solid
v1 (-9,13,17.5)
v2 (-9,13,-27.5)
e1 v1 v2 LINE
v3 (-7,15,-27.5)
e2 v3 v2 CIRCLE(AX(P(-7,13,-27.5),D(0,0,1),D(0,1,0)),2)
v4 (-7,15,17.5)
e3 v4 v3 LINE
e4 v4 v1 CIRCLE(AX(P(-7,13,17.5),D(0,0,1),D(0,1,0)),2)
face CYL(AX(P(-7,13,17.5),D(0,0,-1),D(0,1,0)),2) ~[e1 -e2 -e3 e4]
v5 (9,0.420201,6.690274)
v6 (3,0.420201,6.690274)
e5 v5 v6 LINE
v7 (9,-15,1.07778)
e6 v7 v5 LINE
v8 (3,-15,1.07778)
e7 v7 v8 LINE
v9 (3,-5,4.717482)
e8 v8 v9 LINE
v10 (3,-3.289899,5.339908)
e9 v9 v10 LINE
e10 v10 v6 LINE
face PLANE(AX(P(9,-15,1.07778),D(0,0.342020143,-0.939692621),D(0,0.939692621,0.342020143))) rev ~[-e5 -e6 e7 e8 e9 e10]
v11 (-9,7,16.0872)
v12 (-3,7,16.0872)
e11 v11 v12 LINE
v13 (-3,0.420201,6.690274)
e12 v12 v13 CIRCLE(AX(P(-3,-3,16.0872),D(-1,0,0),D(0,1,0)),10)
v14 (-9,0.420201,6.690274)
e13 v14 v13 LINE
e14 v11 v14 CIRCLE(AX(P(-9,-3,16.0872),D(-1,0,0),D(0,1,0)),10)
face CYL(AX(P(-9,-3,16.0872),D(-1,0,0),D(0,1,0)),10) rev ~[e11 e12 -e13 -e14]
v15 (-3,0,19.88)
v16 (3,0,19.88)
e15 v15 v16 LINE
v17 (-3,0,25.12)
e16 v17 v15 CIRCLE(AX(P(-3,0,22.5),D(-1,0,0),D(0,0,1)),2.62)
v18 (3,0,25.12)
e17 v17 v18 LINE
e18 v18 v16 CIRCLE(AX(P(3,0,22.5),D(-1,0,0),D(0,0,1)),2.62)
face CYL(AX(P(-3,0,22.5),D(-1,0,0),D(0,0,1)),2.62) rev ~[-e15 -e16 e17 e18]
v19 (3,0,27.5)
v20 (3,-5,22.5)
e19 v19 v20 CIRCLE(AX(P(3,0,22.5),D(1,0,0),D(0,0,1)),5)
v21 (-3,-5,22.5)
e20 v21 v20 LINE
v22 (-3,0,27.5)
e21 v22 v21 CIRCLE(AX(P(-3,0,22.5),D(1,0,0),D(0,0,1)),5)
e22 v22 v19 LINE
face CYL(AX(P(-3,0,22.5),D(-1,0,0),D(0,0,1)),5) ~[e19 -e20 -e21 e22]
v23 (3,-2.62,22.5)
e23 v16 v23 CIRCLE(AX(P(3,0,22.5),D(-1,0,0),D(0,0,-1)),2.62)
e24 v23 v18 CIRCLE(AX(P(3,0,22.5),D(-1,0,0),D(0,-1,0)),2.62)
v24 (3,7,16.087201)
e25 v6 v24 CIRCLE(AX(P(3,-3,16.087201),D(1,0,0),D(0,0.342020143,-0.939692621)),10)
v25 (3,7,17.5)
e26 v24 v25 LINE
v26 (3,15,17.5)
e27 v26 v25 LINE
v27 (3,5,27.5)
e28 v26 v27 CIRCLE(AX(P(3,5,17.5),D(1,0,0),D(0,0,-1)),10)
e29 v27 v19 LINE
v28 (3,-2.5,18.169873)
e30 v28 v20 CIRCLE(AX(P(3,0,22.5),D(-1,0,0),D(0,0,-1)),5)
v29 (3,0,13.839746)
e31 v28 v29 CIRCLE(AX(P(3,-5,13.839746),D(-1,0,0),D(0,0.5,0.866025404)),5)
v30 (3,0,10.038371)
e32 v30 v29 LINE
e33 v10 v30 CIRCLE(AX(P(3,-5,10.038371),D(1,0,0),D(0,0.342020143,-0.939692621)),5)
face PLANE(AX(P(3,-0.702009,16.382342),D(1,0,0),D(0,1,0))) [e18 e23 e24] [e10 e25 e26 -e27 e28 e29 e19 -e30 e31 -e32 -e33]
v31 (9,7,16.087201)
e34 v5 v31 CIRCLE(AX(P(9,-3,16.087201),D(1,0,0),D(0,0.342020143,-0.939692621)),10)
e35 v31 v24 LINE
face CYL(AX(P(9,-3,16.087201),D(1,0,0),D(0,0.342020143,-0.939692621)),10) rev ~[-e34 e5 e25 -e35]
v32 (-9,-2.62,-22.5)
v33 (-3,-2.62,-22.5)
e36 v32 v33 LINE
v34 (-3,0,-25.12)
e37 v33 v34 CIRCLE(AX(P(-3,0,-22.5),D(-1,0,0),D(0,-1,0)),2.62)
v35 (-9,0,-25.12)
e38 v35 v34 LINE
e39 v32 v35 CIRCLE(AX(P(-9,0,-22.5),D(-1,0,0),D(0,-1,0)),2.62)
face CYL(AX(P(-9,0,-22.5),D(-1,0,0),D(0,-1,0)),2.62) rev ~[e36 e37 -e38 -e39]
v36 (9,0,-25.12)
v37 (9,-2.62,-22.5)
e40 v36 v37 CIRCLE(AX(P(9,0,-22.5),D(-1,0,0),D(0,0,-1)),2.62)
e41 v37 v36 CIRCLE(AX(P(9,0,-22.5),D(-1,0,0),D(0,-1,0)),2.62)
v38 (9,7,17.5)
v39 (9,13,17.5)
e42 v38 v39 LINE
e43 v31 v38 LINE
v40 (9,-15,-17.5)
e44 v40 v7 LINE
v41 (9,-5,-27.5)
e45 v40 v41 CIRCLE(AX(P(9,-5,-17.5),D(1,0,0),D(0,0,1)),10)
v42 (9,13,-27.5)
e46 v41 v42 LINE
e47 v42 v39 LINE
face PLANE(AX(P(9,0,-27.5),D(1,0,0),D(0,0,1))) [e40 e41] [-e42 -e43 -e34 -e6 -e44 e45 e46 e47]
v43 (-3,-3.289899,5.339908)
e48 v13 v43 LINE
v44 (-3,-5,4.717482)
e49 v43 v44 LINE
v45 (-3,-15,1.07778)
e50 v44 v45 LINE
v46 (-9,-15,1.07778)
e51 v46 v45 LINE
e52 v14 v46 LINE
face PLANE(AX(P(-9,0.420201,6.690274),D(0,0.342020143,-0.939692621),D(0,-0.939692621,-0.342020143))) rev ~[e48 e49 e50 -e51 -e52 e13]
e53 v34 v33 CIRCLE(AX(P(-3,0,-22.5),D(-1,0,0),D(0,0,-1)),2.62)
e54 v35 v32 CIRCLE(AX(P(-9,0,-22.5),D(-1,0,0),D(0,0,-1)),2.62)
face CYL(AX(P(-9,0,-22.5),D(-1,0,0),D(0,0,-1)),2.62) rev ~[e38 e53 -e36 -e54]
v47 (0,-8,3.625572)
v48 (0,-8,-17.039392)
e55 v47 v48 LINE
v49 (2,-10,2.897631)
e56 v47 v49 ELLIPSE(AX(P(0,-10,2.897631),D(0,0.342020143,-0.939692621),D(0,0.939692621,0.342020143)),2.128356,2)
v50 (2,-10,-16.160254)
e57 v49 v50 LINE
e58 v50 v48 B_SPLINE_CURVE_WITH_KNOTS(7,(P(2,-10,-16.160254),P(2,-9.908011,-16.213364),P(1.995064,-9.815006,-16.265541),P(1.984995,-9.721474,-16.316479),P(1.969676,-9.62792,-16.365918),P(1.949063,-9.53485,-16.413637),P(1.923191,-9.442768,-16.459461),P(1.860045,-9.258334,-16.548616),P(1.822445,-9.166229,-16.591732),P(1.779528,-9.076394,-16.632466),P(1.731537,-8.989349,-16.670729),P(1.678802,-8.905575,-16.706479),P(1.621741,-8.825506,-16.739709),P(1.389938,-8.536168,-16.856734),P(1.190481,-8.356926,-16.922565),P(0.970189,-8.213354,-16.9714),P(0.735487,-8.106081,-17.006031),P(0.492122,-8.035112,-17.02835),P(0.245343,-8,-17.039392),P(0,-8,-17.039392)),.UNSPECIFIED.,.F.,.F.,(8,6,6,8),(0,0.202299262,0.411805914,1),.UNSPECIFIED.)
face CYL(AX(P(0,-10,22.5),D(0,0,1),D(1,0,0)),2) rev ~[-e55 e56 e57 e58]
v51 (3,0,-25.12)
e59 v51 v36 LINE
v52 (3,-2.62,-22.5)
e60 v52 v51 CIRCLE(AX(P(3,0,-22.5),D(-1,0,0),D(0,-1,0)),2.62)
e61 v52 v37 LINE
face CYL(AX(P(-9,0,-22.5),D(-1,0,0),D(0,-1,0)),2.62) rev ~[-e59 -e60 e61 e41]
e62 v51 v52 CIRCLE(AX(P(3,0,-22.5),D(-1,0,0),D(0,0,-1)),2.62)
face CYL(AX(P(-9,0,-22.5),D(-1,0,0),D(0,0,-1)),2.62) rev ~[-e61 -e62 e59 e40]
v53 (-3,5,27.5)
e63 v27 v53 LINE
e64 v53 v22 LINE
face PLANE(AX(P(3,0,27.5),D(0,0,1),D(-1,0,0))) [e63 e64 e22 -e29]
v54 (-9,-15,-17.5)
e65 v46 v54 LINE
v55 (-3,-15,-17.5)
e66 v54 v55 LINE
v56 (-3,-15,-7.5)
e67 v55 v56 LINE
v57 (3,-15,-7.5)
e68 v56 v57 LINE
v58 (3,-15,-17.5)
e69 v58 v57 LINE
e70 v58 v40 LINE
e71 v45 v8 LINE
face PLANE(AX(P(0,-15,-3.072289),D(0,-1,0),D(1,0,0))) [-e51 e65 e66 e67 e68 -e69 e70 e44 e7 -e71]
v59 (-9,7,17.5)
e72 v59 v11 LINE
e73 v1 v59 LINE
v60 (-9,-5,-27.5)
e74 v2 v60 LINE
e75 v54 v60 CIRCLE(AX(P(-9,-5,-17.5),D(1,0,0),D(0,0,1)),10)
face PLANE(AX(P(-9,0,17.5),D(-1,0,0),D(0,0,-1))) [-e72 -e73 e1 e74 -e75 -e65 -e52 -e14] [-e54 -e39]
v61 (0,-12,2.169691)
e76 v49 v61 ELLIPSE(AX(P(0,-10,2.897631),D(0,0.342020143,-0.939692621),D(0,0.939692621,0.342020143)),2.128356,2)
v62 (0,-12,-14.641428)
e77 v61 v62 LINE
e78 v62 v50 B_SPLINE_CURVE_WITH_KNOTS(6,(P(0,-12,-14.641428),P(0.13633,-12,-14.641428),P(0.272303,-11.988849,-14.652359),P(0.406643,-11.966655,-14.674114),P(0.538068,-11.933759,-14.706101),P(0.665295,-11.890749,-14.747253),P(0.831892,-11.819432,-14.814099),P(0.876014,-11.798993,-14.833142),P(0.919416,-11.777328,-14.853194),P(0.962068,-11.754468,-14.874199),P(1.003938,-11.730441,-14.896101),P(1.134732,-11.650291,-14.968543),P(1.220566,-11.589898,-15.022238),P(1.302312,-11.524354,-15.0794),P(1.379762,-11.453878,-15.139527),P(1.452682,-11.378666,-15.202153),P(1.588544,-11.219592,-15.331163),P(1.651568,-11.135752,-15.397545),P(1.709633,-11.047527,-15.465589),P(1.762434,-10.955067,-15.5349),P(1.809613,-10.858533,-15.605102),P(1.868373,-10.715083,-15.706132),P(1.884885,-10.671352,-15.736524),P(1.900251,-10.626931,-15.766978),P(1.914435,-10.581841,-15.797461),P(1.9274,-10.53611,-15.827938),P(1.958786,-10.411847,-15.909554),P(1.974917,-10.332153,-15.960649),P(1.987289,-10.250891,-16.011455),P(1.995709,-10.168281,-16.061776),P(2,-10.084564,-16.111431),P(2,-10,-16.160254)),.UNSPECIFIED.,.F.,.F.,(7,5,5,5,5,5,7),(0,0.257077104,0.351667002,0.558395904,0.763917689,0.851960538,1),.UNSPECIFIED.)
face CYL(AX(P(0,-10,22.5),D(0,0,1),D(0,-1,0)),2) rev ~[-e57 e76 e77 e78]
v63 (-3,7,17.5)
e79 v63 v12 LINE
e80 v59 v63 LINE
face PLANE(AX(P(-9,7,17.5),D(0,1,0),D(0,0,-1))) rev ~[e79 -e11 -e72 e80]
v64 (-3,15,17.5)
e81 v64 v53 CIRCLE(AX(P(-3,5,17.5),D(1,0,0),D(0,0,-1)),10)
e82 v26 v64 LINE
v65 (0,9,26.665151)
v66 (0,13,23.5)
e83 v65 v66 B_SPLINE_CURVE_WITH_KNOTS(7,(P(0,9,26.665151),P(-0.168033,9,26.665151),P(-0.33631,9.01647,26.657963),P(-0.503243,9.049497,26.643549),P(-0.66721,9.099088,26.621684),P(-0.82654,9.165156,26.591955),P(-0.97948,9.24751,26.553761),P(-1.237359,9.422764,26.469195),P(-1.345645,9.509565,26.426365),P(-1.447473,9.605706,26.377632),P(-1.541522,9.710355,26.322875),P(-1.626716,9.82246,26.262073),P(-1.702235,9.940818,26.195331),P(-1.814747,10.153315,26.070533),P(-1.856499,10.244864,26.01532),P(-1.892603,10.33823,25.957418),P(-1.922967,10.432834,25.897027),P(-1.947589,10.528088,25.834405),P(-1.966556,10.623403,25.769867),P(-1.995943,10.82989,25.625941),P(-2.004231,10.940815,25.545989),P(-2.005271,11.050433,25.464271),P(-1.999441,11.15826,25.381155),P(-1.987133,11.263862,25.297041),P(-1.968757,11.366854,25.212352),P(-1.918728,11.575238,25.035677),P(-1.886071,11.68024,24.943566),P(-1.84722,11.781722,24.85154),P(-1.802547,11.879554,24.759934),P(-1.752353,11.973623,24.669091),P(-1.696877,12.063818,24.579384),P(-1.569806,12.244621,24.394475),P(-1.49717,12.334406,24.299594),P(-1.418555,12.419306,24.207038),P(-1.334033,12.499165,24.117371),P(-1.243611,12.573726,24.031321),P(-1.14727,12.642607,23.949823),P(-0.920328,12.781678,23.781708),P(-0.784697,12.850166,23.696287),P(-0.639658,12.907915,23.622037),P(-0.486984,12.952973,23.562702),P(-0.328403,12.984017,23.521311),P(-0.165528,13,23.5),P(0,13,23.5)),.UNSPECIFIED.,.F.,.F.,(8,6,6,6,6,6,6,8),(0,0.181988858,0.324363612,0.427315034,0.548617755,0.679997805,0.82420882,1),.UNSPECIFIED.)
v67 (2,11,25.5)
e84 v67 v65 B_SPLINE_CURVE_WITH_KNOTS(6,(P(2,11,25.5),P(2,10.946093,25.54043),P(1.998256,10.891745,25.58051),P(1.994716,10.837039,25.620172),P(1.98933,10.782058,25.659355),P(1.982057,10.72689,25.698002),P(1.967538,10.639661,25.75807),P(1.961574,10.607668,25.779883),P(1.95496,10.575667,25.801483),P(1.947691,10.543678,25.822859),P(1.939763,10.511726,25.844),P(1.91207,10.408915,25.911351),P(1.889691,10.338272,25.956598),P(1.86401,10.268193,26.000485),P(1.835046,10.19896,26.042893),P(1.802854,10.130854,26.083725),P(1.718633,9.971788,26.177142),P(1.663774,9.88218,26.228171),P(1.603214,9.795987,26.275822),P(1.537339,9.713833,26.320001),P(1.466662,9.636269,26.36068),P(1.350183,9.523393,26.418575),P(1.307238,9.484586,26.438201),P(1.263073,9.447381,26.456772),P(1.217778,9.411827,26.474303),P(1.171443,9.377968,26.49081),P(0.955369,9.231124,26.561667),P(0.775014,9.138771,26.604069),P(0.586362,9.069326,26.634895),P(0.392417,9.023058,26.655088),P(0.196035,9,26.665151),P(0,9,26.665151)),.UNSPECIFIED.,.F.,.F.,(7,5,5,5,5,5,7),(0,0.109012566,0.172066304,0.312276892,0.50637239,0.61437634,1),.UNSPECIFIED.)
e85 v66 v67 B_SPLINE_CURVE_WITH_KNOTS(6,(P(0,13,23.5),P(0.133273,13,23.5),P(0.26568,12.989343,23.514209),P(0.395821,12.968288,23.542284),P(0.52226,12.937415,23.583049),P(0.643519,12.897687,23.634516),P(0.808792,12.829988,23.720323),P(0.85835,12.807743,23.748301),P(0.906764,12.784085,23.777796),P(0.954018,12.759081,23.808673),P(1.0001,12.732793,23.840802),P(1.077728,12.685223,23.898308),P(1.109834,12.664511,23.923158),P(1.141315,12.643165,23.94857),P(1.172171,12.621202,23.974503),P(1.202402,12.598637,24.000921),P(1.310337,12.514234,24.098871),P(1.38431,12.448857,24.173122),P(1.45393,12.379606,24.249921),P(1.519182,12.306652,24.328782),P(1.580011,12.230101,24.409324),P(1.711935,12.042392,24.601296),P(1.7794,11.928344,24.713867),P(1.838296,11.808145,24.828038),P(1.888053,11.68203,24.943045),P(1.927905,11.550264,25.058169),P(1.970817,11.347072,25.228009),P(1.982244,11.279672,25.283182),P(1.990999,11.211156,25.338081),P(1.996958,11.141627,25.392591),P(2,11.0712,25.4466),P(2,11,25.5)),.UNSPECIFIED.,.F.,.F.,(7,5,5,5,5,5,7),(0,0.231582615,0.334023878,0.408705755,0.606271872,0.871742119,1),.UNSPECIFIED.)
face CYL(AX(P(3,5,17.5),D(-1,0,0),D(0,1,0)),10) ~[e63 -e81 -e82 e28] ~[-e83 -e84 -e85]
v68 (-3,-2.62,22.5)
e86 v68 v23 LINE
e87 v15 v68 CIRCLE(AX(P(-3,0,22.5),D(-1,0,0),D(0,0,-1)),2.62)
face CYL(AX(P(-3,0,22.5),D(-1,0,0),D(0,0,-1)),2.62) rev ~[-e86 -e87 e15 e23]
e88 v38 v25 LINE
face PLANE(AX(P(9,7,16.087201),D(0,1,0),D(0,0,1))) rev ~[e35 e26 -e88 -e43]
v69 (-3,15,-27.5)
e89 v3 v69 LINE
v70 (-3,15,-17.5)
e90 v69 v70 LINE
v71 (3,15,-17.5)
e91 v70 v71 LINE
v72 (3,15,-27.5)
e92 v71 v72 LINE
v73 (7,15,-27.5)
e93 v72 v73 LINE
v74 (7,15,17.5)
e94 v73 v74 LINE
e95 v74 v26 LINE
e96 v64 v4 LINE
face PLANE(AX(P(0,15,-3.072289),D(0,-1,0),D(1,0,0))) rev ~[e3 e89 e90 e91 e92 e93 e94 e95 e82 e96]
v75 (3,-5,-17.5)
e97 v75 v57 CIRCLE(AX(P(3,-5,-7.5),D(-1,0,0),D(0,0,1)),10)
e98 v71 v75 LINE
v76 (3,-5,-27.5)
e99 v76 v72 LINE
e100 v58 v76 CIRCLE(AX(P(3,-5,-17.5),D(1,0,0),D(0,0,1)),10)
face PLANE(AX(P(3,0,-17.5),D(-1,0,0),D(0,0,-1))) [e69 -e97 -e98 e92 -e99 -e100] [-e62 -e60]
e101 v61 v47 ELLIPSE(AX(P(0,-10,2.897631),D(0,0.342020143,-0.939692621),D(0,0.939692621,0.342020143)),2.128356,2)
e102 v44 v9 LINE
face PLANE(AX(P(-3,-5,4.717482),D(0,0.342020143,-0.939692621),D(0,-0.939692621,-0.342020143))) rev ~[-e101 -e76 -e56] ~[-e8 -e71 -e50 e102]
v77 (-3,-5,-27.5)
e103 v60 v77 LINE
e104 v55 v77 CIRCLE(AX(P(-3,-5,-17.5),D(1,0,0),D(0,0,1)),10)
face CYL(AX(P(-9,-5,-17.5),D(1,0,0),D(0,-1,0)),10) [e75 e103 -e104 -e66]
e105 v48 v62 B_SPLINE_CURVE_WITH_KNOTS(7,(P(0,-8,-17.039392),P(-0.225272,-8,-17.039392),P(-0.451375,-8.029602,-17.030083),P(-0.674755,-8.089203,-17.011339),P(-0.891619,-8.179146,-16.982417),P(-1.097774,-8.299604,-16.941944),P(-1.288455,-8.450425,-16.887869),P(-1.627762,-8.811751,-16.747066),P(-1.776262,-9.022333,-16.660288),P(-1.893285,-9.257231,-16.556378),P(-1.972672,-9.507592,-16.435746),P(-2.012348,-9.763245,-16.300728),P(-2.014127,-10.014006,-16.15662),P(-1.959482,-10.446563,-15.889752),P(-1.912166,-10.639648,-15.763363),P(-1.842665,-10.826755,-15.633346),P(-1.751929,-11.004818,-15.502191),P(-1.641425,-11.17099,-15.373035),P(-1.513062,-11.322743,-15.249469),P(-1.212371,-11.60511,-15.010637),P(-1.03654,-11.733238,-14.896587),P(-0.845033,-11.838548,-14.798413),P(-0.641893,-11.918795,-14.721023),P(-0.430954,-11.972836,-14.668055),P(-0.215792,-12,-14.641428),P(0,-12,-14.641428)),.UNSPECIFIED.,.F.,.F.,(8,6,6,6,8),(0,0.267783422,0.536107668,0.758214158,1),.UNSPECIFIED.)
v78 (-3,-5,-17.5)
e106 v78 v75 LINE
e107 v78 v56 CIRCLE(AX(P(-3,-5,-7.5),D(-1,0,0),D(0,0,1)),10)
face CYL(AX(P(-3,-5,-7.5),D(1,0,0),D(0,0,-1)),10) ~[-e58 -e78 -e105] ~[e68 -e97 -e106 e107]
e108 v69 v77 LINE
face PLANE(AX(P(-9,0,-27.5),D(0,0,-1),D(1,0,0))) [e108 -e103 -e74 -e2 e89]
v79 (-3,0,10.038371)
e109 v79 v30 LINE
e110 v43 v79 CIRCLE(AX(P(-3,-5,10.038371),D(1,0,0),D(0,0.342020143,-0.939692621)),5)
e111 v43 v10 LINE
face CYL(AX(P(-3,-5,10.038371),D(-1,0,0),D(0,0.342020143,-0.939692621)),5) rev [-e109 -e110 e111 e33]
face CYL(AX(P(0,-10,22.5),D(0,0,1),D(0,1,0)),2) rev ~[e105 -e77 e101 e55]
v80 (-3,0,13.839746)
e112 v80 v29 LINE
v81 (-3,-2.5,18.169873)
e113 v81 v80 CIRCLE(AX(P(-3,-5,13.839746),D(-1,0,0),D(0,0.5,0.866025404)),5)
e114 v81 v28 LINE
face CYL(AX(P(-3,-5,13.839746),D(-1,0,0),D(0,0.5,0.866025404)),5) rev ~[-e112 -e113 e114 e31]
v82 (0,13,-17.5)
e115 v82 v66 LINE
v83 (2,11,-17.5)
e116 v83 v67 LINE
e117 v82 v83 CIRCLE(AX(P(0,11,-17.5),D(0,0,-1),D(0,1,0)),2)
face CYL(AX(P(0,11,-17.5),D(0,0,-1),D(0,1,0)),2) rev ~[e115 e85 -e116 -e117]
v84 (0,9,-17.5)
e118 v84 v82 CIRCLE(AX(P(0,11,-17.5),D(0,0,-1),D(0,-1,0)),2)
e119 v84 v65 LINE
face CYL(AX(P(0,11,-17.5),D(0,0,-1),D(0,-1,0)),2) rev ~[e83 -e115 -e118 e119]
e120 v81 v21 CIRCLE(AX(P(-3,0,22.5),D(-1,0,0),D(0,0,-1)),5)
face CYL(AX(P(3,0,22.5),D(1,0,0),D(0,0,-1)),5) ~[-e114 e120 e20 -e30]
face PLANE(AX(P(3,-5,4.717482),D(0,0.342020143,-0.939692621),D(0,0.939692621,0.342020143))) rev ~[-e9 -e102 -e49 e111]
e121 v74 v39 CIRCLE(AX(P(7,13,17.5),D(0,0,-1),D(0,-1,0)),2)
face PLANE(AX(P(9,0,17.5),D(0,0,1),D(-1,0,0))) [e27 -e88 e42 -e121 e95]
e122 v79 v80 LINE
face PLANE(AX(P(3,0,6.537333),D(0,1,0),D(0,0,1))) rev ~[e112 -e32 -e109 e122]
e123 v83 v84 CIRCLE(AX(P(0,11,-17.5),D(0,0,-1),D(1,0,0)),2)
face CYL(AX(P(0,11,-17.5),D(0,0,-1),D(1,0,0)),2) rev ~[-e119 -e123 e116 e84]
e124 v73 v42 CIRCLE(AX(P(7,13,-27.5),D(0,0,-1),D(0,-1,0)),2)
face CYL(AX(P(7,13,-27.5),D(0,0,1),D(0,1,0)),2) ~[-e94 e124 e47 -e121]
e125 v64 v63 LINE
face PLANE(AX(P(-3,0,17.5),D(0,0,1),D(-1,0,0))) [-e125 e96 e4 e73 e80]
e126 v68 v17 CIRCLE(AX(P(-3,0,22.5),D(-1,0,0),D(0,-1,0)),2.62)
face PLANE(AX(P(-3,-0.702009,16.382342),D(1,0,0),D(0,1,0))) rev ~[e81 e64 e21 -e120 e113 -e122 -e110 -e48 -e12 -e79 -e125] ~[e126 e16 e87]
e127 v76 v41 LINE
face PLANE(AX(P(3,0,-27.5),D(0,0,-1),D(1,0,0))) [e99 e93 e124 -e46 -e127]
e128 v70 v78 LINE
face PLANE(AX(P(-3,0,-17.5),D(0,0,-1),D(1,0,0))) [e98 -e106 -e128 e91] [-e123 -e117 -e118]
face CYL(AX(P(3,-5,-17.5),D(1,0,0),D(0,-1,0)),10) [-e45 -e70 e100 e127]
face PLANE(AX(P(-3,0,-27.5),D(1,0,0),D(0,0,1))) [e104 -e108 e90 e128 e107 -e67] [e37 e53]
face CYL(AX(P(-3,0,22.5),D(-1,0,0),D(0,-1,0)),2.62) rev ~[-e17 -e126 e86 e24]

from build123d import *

# Parameters (mm, degrees)
F1_DEPTH     = 15
F3_DEPTH     = 6
F5_DEPTH     = 18
F6_R         = 10
F9_DEPTH     = 6
F10_DEPTH    = 6
F11_R        = 2
F13_DEPTH    = 6
F15_R        = 10
F19_DEPTH    = 50.001
F21_DEPTH    = 45.001
F23_DEPTH    = 6
F24_T1_DEPTH = 6


# Not quite as in the source:
# - a fillet or chamfer that OpenCascade refuses, or shapes differently, is made with other operations: its cross-section is extruded or revolved along the edge and cut away or added


with BuildPart() as f1:
    # F0 (on Front) → F1 (new body, symmetric)
    with BuildSketch(Plane.XZ):
        Polygon((9, -17.5), (9, 17.5), (3, 17.5), (3, 27.5), (-3, 27.5), (-3, 17.5), (-9, 17.5), (-9, -17.5), (-9, -27.5), (-3, -27.5), (-3, -17.5), (3, -17.5), (3, -27.5), (9, -27.5), align=None)
    extrude(amount=F1_DEPTH, both=True)

    # F2 (on face) → F3 (cut)
    with BuildSketch(Plane(origin=(-3, 0, 0), x_dir=(0, -1, 0), z_dir=(-1, 0, 0))):
        with BuildLine():
            ThreePointArc((0, 25.12), (-2.62, 22.5), (0, 19.88))
            Line((0, 19.88), (0, 25.12))
        make_face()
        with BuildLine():
            Line((0, 25.12), (0, 19.88))
            ThreePointArc((0, 19.88), (1.8526197667, 20.6473802333), (2.62, 22.5))
            ThreePointArc((2.62, 22.5), (1.8526197667, 24.3526197667), (0, 25.12))
        make_face()
    extrude(amount=-F3_DEPTH, mode=Mode.SUBTRACT)

    # F4 (on face) → F5 (cut)
    with BuildSketch(Plane(origin=(-9, 0, 0), x_dir=(0, -1, 0), z_dir=(-1, 0, 0))):
        with BuildLine():
            ThreePointArc((0, -25.12), (1.8526197667, -24.3526197667), (2.62, -22.5))
            ThreePointArc((2.62, -22.5), (-1.8526197667, -20.6473802333), (0, -25.12))
        make_face()
    extrude(amount=-F5_DEPTH, mode=Mode.SUBTRACT)

    # F6
    f6_edges = [f1.edges().sort_by_distance(p)[0] for p in [
        (0, 15, 27.5),
        (0, -15, 27.5),
        (6, -15, -27.5),
        (-6, -15, -27.5),
    ]]
    fillet(f6_edges, radius=F6_R)

    # F8 (on face) → F9 (cut)
    with BuildSketch(Plane(origin=(-9, 0, 0), x_dir=(0, -1, 0), z_dir=(-1, 0, 0))):
        with BuildLine():
            ThreePointArc((-7, 16.0872004348), (-5.1915204429, 10.3514360713), (-0.4202014333, 6.690274227))
            Line((-0.4202014333, 6.690274227), (15, 1.0777798989))
            Line((15, 1.0777798989), (15, 17.5))
            Line((15, 17.5), (-7, 17.5))
            Line((-7, 17.5), (-7, 16.0872004348))
        make_face()
    extrude(amount=-F9_DEPTH, mode=Mode.SUBTRACT)

    # F7 (on face) → F10 (cut)
    with BuildSketch(Plane.YZ.offset(9)):
        with BuildLine():
            Line((7, 17.5), (-15, 17.5))
            Line((-15, 17.5), (-15, 1.07778))
            Line((-15, 1.07778), (0.4202014333, 6.6902743281))
            ThreePointArc((0.4202014333, 6.6902743281), (5.1915204429, 10.3514361724), (7, 16.087200536))
            Line((7, 16.087200536), (7, 17.5))
        make_face()
    extrude(amount=-F10_DEPTH, mode=Mode.SUBTRACT)

    # F11
    f11_edges = [f1.edges().sort_by_distance(p)[0] for p in [
        (9, 15, -5),
        (-9, 15, -5),
    ]]
    fillet(f11_edges, radius=F11_R)

    # F12 (on face) → F13 (cut)
    with BuildSketch(Plane(origin=(-3, 0, 0), x_dir=(0, -1, 0), z_dir=(-1, 0, 0))):
        with BuildLine():
            Line((5, 27.5), (0, 27.5))
            ThreePointArc((0, 27.5), (3.5355339059, 26.0355339059), (5, 22.5))
            Line((5, 22.5), (5, 4.7174822415))
            Line((5, 4.7174822415), (15, 1.0777798989))
            Line((15, 1.0777798989), (15, 17.5))
            ThreePointArc((15, 17.5), (12.0710678119, 24.5710678119), (5, 27.5))
        make_face()
    extrude(amount=-F13_DEPTH, mode=Mode.SUBTRACT)

    # F15
    f15_edges = [f1.edges().sort_by_distance(p)[0] for p in [
        (0, -15, -17.5),
    ]]
    fillet(f15_edges, radius=F15_R)

    # F18 (on face) → F19 (cut, through all)
    with BuildSketch(Plane.XY.offset(22.5)):
        with BuildLine():
            ThreePointArc((2, -10), (1.4142135624, -8.5857864376), (0, -8))
            Line((0, -8), (0, -12))
            ThreePointArc((0, -12), (1.4142135624, -11.4142135624), (2, -10))
        make_face()
        with BuildLine():
            Line((0, -12), (0, -8))
            ThreePointArc((0, -8), (-2, -10), (0, -12))
        make_face()
    extrude(amount=-F19_DEPTH, mode=Mode.SUBTRACT)

    # F20 (on face) → F21 (cut, through all)
    with BuildSketch(Plane(origin=(0, 0, -17.5), x_dir=(1, 0, 0), z_dir=(0, 0, -1))):
        with BuildLine():
            ThreePointArc((0, -9), (-2, -11), (0, -13))
            Line((0, -13), (0, -11))
            Line((0, -11), (0, -9))
        make_face()
        with BuildLine():
            Line((0, -11), (0, -13))
            ThreePointArc((0, -13), (1.4142135624, -12.4142135624), (2, -11))
            ThreePointArc((2, -11), (1.4142135624, -9.5857864376), (0, -9))
            Line((0, -9), (0, -11))
        make_face()
    extrude(amount=-F21_DEPTH, mode=Mode.SUBTRACT)

    # F22 (on face) → F23 (cut)
    with BuildSketch(Plane.YZ.offset(3)):
        with BuildLine():
            ThreePointArc((0, 17.5), (-3.5355339059, 18.9644660941), (-5, 22.5))
            Line((-5, 22.5), (-5, 4.7174822415))
            Line((-5, 4.7174822415), (0, 6.5373334129))
            Line((0, 6.5373334129), (0, 17.5))
        make_face()
    extrude(amount=-F23_DEPTH, mode=Mode.SUBTRACT)

    # F24: fillet of radius 5 on 2 edges, made by hand

    # F24_s2 → F24_t1 (join)
    with BuildSketch(Plane.YZ.offset(-3)):
        with BuildLine():
            ThreePointArc((-2.5, 18.1698729811), (-0.6698729811, 16.3397459622), (0, 13.8397459622))
            Line((0, 13.8397459622), (0, 17.5))
            ThreePointArc((0, 17.5), (-1.2940952255, 17.6703708686), (-2.5, 18.1698729811))
        make_face()
        with BuildLine():
            ThreePointArc((-3.2898992834, 5.3399081011), (-0.9042397786, 7.1704890233), (0, 10.038371205))
            Line((0, 10.038371205), (0, 6.5373334129))
            Line((0, 6.5373334129), (-3.2898992834, 5.3399081011))
        make_face()
    extrude(amount=F24_T1_DEPTH)


solid = f1.part
